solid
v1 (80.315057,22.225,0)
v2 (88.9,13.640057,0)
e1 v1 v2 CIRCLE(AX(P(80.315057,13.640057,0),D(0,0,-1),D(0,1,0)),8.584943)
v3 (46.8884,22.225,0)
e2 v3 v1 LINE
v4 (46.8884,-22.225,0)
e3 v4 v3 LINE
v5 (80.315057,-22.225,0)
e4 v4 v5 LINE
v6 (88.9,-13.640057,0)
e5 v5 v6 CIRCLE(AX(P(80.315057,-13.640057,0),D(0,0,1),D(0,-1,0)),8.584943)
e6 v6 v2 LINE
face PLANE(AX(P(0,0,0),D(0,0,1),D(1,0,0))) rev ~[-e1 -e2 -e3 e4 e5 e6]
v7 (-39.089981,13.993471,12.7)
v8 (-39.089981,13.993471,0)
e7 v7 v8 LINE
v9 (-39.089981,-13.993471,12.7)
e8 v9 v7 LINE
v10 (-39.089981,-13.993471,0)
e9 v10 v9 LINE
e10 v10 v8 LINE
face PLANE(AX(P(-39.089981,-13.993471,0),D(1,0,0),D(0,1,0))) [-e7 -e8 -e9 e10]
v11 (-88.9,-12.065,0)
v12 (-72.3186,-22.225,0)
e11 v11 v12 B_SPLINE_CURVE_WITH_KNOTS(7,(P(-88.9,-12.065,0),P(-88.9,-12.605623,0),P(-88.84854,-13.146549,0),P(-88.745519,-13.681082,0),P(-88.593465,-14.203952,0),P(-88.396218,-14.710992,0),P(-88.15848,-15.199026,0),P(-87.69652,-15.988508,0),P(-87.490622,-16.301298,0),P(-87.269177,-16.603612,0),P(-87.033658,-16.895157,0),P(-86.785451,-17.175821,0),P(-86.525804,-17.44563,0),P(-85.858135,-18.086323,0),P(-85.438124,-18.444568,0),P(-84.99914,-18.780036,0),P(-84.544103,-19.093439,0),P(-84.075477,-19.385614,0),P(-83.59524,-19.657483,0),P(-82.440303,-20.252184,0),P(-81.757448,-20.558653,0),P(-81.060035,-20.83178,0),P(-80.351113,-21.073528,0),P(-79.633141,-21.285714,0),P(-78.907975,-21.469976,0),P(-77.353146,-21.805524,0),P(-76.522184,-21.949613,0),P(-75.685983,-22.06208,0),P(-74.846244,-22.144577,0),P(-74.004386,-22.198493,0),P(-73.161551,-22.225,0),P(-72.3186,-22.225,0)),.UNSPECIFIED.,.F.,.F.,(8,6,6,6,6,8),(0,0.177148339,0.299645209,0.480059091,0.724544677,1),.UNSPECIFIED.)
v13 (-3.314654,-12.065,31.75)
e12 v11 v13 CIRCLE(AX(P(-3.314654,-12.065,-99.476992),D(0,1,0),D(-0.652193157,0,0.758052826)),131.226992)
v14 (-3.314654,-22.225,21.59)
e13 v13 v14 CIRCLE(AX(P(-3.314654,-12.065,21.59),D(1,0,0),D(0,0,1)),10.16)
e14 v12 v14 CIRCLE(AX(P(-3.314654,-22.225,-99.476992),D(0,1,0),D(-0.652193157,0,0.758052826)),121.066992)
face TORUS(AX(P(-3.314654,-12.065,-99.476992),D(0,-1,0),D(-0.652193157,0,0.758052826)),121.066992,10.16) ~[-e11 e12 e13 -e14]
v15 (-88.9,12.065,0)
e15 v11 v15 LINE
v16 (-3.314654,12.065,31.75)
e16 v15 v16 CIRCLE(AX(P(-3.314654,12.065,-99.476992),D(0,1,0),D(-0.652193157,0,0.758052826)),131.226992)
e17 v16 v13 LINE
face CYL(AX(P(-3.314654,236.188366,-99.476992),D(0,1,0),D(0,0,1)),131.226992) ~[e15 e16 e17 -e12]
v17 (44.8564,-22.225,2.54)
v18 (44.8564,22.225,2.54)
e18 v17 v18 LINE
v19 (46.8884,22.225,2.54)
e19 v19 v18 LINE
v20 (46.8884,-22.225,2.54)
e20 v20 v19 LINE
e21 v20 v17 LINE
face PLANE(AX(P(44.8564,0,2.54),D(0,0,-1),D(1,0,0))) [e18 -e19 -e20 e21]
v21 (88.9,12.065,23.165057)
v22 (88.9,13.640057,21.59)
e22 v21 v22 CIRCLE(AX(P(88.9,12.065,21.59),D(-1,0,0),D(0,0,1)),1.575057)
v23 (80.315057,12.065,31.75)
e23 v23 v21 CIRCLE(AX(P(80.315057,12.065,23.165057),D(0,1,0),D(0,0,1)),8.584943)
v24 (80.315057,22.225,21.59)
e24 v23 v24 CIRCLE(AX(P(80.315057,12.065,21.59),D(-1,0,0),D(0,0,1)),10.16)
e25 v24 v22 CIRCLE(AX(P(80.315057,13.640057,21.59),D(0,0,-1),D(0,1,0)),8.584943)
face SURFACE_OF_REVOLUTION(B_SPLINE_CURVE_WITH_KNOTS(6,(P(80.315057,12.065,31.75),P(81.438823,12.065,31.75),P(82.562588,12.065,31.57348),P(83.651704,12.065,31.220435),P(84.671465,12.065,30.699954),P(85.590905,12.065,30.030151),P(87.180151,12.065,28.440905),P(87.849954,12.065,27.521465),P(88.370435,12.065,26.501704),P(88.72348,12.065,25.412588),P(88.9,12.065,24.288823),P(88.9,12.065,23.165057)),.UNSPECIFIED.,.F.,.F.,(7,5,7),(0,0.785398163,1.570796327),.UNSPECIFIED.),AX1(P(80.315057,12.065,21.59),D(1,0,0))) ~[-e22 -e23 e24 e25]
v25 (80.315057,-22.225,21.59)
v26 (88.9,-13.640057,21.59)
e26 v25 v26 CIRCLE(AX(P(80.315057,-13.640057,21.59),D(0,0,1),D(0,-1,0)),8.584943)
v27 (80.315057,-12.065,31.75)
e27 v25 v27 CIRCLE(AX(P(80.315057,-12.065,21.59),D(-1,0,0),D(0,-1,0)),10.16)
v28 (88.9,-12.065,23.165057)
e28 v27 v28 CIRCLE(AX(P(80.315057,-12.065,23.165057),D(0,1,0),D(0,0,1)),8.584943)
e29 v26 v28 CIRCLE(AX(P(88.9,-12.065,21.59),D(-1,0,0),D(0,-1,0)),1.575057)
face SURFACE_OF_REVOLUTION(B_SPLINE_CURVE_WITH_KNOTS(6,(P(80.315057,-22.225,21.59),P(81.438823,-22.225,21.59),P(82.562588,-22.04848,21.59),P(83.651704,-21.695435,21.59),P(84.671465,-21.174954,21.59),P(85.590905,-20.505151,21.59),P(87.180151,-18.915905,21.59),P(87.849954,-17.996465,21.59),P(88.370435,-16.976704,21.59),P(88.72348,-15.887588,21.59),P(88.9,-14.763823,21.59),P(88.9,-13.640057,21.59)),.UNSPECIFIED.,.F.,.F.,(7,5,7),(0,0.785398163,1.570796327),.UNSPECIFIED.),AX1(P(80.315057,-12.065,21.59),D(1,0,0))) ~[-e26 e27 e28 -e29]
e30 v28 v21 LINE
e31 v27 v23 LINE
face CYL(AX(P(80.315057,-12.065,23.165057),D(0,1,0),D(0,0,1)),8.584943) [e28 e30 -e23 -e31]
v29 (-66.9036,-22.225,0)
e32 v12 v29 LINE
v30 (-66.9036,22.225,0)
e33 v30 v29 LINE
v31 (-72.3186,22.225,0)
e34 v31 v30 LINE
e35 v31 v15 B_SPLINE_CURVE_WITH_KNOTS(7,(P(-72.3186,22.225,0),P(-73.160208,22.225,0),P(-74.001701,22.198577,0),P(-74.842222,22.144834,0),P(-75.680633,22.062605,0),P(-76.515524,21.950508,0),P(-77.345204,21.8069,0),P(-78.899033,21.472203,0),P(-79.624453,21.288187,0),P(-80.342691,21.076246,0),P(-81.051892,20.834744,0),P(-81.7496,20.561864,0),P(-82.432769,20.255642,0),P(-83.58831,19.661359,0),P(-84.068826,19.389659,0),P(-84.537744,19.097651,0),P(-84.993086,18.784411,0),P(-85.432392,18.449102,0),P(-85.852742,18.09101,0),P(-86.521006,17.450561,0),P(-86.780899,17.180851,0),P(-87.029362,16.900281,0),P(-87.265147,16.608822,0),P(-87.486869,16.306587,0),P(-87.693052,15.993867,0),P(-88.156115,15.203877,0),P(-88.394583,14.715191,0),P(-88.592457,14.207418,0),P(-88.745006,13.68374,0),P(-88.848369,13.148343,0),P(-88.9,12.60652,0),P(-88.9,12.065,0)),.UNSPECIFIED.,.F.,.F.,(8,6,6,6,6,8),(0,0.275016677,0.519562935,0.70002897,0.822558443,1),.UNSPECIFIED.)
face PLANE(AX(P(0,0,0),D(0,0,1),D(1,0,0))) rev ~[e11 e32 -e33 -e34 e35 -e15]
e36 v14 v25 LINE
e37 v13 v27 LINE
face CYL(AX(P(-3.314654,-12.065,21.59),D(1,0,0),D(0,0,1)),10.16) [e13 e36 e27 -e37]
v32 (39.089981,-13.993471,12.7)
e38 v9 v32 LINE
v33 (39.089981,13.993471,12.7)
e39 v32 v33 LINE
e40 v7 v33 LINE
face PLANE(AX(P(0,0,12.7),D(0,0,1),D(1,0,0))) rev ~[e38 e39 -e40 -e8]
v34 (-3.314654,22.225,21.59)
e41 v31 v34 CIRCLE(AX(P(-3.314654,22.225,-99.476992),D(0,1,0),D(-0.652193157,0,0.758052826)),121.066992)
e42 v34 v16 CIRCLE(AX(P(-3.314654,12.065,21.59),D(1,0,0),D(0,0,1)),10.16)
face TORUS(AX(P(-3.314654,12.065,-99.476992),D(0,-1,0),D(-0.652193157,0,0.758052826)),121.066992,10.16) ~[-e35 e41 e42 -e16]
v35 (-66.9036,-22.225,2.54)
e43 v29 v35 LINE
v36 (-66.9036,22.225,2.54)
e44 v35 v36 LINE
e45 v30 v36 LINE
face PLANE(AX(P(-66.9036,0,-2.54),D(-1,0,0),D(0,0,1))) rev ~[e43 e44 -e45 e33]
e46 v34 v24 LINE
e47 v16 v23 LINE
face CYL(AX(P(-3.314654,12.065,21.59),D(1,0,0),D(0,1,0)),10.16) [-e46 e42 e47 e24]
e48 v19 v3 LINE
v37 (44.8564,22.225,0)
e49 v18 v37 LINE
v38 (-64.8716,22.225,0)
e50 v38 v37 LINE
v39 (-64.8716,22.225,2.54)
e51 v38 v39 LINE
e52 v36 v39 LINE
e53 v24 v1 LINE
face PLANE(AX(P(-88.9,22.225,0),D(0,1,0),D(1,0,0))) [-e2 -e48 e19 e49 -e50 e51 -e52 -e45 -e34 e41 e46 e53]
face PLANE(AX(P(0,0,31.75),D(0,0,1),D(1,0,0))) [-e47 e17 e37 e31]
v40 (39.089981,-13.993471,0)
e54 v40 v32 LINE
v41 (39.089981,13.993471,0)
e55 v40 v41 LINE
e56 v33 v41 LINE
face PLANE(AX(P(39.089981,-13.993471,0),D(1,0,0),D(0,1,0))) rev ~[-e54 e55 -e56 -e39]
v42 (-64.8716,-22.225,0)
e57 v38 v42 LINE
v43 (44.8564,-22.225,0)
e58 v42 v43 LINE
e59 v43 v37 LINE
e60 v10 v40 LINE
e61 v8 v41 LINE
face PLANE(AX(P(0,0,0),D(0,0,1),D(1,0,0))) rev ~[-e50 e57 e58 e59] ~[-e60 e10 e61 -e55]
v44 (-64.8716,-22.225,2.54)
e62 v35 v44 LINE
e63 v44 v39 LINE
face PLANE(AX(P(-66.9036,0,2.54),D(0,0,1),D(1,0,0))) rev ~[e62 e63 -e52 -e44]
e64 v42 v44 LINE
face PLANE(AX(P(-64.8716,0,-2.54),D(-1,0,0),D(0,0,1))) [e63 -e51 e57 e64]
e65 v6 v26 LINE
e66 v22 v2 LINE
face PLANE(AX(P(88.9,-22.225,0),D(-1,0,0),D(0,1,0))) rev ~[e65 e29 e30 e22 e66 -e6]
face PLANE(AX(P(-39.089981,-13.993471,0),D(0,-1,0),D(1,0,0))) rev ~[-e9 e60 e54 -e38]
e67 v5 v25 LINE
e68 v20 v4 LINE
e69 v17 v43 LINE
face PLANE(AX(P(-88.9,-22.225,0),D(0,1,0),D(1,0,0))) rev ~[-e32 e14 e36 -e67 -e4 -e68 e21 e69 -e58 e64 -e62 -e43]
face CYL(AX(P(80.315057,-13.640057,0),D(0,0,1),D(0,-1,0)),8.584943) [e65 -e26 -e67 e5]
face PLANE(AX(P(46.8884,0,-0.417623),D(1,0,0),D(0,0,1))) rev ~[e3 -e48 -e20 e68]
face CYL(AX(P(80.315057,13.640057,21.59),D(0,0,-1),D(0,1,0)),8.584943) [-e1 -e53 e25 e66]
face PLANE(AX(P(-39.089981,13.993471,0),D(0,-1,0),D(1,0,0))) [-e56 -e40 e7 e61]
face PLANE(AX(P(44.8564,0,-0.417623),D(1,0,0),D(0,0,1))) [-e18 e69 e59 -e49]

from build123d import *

# Parameters (mm, degrees)
F0_W        = 177.8
F0_H        = 44.45
F1_DEPTH    = 31.75
F2_W        = 2.032
F2_H        = 5.08
F2_H_2      = 2.957622528
F3_DEPTH    = 70.866
F4_T1_DEPTH = 472.3767319638
F5_R        = 10.16
F6_R        = 10.16
F7_R        = 8.5849434278
F8_W        = 78.1799629331
F8_H        = 27.9869418591
F9_DEPTH    = 12.7


# Not quite as in the source:
# - a fillet or chamfer that OpenCascade refuses, or shapes differently, is made with other operations: its cross-section is extruded or revolved along the edge and cut away or added


with BuildPart() as f1:
    # F0 (on Top) → F1 (new body)
    with BuildSketch(Plane.XY):
        Rectangle(F0_W, F0_H)
    extrude(amount=F1_DEPTH)

    # F2 (on Front) → F3 (cut, symmetric)
    with BuildSketch(Plane.XZ):
        with Locations((-65.8876, 0)):
            Rectangle(F2_W, F2_H)
        with Locations((45.8724, 1.061188736)):
            Rectangle(F2_W, F2_H_2)
    extrude(amount=F3_DEPTH, both=True, mode=Mode.SUBTRACT)

    # F4: fillet of radius 131.2269923964 on 1 edges, made by hand

    # F4_s2 → F4_t1 (cut)
    with BuildSketch(Plane.XZ.offset(-236.1883659819)):
        with BuildLine():
            ThreePointArc((-3.3146536072, 31.75), (-48.9570517069, 23.5567226134), (-88.9, 0))
            Line((-88.9, 0), (-88.9, 31.75))
            Line((-88.9, 31.75), (-3.3146536072, 31.75))
        make_face()
    extrude(amount=F4_T1_DEPTH, mode=Mode.SUBTRACT)

    # F5
    f5_edges = [f1.edges().sort_by_distance(p)[0] for p in [
        (-48.957052, -22.225, 23.556723),
    ]]
    fillet(f5_edges, radius=F5_R)

    # F6
    f6_edges = [f1.edges().sort_by_distance(p)[0] for p in [
        (42.792673, 22.225, 31.75),
        (-48.957052, 22.225, 23.556723),
    ]]
    fillet(f6_edges, radius=F6_R)

    # F7
    f7_edges = [f1.edges().sort_by_distance(p)[0] for p in [
        (88.9, 0, 31.75),
        (88.9, 22.225, 10.795),
        (88.9, -22.225, 10.795),
        (88.9, 19.249205, 28.774205),
        (88.9, -19.249205, 28.774205),
    ]]
    fillet(f7_edges, radius=F7_R)

    # F8 (on Top) → F9 (cut, symmetric)
    with BuildSketch(Plane.XY):
        Rectangle(F8_W, F8_H)
    extrude(amount=F9_DEPTH, both=True, mode=Mode.SUBTRACT)


solid = f1.part
